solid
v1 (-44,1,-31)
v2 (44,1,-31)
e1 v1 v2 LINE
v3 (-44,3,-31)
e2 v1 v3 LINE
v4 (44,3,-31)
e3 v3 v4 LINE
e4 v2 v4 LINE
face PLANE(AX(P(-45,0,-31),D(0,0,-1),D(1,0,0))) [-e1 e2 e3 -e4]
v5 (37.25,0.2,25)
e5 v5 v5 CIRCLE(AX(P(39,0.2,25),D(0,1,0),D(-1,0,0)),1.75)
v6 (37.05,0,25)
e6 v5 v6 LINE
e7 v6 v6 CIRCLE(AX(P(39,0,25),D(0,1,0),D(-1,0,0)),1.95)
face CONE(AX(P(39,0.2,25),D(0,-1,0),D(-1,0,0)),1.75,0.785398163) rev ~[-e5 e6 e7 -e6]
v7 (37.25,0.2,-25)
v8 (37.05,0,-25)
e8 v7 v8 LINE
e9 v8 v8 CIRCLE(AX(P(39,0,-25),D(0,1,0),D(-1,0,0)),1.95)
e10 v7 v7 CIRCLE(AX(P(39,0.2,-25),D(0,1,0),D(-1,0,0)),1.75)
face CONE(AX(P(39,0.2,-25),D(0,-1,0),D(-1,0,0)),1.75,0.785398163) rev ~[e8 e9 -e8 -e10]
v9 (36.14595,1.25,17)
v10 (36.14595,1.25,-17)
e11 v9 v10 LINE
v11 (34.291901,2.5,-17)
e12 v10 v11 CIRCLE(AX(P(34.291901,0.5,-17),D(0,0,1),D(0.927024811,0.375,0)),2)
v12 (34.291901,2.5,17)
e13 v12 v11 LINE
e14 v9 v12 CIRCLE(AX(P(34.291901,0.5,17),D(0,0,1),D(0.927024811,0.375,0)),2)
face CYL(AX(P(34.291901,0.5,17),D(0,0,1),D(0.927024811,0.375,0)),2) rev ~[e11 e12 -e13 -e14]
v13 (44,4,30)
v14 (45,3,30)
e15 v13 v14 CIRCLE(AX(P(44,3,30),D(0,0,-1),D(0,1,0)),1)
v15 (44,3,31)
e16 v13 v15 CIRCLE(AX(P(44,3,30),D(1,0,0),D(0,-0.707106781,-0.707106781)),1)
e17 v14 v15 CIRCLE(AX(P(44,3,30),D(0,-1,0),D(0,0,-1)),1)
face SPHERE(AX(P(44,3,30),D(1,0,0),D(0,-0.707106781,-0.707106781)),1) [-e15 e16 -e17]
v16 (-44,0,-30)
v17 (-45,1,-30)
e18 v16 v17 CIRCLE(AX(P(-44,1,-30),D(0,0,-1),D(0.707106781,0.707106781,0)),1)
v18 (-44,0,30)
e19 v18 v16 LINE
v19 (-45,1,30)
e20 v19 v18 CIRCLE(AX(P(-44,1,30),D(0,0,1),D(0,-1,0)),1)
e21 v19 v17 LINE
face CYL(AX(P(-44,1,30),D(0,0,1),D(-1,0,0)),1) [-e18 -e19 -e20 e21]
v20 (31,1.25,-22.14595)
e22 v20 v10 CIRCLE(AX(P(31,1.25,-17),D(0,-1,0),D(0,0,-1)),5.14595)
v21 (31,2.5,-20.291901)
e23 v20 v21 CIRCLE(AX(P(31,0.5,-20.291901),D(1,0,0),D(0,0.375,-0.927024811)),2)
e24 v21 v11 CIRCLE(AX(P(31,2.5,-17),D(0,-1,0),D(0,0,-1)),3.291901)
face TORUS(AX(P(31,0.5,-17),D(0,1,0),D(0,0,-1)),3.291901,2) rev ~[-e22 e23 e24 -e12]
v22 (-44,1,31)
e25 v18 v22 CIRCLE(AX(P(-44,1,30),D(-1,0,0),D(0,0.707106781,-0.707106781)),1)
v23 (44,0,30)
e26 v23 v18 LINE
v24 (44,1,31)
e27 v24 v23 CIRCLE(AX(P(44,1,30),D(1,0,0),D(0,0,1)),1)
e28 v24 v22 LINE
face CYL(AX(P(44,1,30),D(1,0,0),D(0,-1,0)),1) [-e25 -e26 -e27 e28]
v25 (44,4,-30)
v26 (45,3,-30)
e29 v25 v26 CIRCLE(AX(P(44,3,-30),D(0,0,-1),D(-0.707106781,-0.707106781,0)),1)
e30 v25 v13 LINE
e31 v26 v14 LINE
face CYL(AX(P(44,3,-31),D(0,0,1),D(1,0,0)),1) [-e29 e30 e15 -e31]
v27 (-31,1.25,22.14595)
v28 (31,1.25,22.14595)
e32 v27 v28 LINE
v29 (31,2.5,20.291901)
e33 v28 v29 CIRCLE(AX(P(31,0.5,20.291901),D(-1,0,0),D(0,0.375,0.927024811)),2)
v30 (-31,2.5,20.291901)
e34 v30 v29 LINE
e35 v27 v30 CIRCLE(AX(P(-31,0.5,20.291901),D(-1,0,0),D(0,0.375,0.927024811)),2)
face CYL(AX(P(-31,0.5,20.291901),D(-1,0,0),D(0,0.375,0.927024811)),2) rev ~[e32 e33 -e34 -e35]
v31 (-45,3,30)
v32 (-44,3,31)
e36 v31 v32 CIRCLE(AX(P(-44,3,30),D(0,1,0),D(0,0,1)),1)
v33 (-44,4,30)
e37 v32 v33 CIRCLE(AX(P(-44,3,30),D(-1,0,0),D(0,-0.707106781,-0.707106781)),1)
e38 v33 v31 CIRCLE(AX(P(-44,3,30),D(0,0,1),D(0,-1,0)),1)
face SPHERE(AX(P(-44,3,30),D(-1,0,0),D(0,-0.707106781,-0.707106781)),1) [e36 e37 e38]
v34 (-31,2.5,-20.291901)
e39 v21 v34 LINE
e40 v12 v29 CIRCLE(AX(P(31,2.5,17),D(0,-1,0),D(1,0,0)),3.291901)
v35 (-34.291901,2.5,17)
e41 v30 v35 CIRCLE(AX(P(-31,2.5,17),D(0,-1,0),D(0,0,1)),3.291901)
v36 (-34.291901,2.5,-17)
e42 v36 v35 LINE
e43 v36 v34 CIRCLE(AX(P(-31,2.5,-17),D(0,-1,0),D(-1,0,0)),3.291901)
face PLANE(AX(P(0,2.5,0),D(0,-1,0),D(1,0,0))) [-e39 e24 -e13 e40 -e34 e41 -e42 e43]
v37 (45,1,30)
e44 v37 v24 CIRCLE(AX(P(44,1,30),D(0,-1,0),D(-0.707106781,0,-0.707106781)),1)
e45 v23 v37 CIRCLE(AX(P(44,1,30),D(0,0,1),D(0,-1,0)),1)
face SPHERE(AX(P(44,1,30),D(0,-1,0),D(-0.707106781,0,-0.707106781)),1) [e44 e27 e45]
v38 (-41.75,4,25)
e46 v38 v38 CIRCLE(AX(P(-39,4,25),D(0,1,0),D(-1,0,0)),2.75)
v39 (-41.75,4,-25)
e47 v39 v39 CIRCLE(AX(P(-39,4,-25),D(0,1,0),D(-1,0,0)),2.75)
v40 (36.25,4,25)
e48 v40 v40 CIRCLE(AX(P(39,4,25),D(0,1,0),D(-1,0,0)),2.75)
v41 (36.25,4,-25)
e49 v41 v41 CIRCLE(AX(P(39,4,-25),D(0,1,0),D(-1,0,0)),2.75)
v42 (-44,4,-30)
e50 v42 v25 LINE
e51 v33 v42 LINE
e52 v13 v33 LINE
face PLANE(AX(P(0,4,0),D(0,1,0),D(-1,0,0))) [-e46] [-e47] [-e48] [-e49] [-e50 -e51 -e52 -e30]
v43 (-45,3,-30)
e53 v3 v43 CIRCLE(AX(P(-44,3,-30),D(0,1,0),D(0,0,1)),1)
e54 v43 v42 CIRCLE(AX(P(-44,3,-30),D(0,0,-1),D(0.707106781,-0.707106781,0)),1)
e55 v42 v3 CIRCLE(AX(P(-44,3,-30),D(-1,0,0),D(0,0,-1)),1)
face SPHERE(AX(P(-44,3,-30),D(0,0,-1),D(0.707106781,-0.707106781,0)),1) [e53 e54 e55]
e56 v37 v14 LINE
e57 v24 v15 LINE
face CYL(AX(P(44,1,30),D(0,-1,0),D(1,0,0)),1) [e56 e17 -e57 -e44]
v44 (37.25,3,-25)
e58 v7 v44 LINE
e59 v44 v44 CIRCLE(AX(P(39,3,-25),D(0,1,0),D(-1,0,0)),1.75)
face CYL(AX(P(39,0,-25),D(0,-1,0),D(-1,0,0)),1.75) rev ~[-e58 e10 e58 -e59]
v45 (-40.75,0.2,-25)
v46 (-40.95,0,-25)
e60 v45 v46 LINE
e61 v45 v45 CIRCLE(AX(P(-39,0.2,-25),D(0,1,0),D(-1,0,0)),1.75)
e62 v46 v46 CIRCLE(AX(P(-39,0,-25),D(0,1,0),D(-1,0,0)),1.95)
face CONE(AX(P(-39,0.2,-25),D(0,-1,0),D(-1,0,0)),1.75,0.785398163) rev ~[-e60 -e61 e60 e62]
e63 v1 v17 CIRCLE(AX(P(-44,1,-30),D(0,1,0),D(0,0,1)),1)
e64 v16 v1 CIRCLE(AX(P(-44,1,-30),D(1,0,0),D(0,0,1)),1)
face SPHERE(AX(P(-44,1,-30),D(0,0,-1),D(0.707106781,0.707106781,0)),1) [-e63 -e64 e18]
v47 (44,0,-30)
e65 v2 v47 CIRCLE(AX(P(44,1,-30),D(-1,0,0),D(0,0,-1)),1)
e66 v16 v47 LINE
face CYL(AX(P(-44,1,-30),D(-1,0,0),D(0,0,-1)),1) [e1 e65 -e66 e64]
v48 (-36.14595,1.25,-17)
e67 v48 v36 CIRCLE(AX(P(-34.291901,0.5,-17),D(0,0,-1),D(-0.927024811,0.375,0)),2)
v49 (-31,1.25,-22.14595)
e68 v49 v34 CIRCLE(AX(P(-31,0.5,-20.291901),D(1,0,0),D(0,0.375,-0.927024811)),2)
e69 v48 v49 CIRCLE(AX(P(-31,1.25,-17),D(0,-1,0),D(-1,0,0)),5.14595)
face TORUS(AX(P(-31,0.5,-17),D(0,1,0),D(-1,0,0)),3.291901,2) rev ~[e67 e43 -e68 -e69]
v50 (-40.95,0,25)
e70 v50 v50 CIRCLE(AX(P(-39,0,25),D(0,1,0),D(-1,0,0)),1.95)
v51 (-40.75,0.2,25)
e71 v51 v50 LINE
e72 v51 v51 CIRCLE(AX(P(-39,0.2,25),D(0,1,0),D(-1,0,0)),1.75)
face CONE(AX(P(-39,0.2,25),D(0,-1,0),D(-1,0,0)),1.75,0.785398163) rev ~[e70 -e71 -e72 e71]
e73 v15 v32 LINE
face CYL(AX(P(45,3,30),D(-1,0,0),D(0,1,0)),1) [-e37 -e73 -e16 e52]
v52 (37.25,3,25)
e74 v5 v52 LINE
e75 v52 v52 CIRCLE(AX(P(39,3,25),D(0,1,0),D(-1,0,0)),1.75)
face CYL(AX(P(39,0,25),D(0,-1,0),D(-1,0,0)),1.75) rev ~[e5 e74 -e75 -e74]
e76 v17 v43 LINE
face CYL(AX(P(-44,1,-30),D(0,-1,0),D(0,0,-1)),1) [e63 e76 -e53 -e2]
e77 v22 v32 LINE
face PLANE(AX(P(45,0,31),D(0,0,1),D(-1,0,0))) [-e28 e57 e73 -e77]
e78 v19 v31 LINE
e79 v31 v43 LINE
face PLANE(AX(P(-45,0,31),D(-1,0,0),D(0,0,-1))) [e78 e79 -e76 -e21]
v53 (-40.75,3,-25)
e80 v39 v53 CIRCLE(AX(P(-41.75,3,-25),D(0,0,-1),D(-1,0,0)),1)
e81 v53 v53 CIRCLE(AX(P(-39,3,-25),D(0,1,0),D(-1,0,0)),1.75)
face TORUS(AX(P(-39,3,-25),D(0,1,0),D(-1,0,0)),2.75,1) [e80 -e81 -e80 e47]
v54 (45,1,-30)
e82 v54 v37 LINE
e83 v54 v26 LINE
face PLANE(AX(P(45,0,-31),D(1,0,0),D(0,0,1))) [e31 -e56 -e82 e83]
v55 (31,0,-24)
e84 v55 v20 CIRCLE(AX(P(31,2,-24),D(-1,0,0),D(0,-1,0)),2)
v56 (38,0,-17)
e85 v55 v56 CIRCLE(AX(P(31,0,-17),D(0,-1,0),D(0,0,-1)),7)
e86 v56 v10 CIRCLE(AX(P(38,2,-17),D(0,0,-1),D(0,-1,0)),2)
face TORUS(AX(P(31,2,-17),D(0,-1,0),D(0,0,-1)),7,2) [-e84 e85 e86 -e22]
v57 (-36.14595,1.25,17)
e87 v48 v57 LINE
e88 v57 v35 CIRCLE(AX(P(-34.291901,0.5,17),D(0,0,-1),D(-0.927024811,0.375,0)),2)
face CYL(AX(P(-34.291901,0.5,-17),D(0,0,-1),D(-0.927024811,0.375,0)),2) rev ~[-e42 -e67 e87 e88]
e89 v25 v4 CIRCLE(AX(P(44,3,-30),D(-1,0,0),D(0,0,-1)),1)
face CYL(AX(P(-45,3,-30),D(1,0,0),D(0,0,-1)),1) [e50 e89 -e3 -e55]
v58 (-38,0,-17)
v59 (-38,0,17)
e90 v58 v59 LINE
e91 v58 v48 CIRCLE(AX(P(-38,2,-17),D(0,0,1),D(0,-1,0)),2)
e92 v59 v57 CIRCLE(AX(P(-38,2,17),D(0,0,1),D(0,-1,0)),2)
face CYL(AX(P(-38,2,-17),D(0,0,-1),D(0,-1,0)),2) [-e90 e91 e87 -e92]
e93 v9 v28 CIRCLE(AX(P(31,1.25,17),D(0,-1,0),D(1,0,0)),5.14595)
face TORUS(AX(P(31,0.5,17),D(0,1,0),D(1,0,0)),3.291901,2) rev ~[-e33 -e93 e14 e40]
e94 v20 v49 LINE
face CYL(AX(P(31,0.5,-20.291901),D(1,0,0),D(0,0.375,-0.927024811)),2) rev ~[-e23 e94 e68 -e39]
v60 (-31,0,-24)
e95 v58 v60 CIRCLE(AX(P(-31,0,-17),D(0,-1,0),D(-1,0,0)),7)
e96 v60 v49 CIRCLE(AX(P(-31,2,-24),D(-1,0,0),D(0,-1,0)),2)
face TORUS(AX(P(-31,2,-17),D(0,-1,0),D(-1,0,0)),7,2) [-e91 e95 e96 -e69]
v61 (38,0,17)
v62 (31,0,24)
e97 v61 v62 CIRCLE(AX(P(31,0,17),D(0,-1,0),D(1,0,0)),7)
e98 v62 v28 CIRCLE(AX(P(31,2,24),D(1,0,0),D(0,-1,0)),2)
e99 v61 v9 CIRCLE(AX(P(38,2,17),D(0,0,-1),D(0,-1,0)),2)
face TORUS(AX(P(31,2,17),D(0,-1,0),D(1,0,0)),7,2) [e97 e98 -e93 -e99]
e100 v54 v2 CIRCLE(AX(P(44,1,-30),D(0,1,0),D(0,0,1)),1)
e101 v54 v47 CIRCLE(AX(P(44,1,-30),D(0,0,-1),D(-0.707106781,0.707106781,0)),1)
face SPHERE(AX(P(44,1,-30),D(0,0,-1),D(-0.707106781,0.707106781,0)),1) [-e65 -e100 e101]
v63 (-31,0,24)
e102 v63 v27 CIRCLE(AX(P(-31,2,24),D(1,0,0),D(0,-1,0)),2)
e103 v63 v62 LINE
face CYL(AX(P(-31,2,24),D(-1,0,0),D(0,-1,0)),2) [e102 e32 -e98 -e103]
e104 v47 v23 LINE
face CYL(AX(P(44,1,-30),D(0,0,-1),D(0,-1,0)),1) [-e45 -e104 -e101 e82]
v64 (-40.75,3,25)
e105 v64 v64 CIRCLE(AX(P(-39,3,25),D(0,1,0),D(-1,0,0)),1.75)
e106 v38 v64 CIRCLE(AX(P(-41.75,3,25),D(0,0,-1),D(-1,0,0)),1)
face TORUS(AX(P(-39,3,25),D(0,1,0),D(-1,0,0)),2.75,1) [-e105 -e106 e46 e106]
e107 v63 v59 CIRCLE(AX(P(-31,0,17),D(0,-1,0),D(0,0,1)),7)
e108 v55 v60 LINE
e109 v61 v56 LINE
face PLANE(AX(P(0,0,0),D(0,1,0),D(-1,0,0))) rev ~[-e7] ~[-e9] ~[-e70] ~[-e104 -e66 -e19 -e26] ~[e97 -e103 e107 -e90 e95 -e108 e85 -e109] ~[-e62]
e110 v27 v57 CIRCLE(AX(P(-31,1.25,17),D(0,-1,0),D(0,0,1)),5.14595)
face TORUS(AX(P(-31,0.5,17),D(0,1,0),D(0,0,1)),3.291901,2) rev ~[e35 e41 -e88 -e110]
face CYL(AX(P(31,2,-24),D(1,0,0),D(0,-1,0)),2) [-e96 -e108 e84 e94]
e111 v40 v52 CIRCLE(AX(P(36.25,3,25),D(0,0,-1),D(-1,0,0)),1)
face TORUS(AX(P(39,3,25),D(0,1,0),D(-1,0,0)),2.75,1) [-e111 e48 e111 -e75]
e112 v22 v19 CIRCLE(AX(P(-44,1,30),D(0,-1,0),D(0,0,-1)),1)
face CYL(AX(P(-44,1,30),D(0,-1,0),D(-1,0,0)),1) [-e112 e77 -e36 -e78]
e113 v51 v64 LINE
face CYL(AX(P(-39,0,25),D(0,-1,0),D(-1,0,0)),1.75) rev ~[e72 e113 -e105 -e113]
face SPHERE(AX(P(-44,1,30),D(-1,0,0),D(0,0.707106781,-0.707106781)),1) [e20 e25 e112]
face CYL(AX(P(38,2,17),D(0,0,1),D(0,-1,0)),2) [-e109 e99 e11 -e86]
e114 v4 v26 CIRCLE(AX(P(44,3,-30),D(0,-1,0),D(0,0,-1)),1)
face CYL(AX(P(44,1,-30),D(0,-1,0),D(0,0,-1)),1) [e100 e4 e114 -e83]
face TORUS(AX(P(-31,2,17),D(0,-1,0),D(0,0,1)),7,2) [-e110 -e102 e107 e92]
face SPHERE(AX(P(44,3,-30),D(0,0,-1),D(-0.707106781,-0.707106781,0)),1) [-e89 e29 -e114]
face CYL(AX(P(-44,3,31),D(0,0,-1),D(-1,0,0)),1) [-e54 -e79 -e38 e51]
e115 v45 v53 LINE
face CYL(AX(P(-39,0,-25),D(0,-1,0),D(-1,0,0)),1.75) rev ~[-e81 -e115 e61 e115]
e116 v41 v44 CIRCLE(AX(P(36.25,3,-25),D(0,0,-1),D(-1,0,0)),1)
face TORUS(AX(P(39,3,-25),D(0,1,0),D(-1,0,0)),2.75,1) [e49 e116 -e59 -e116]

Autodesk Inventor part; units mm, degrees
ref_plane "YZ Plane" through (0, 0, 0) normal (1, 0, 0) x (0, 1, 0)
ref_plane "XZ Plane" through (0, 0, 0) normal (0, 1, 0) x (-1, 0, 0)
ref_plane "XY Plane" through (0, 0, 0) normal (0, 0, 1) x (1, 0, 0)
sketch "Sketch1" plane through (0, 0, 0) normal (0, 1, 0) x (-1, 0, 0)
  line L0 (45, -31) -> (-45, -31)
  line L1 (-45, -31) -> (-45, 31)
  line L2 (-45, 31) -> (45, 31)
  line L3 (45, 31) -> (45, -31)
  circle A0 centre (39, -25) radius 1.75
  circle A1 centre (-39, -25) radius 1.75
  circle A2 centre (-39, 25) radius 1.75
  circle A3 centre (39, 25) radius 1.75
  point P0 (0, 0)
  dimension "d0" = 3.5
  dimension "d1" = 3.5
  dimension "d2" = 3.5
  dimension "d3" = 3.5
  dimension "d4" = 6
  dimension "d5" = 6
  dimension "d6" = 6
  dimension "d7" = 6
  dimension "d8" = 6
  dimension "d9" = 6
  dimension "d10" = 6
  dimension "d11" = 6
  dimension "d12" = 90
  dimension "d13" = 45
  dimension "d14" = 62
  dimension "d15" = 31
extrude "Extrusion1" add sketch "Sketch1" along normal blind 4
sketch "Sketch2" plane through (0, 0, 0) normal (0, -1, 0) x (1, 0, 0)
  circle A0 centre (-39, 25) radius 1.75 projected
  circle A1 centre (39, 25) radius 1.75 projected
  circle A2 centre (39, -25) radius 1.75 projected
  circle A3 centre (-39, -25) radius 1.75 projected
  line L0 (-45, -31) -> (45, -31) projected
  line L1 (45, -31) -> (45, 31) projected
  line L2 (45, 31) -> (-45, 31) projected
  line L3 (-45, 31) -> (-45, -31) projected
  line L4 (-31, 22) -> (31, 22)
  line L5 (36, 17) -> (36, -17)
  line L6 (31, -22) -> (-31, -22)
  line L7 (-36, -17) -> (-36, 17)
  arc A4 (-31, 22) -> (-36, 17) centre (-31, 17) ccw
  arc A5 (-36, -17) -> (-31, -22) centre (-31, -17) ccw
  arc A6 (31, -22) -> (36, -17) centre (31, -17) ccw
  arc A7 (36, 17) -> (31, 22) centre (31, 17) ccw
  point P0 (0, 0)
  dimension "d18" = 5
  dimension "d19" = 5
  dimension "d20" = 9
extrude "Extrusion2" cut sketch "Sketch2" against normal blind 2.5 contours L4 A7 L5 A6 L6 A5 L7 A4
fillet "Fillet1" radius 2 16 edges at (0, 0, 22) (0, 2.5, 22) (34.5355, 0, 20.5355) (36, 0, 0) (34.5355, 0, -20.5355) (0, 0, -22) (-34.5355, 0, -20.5355) (-36, 0, 0) (-34.5355, 0, 20.5355) (34.5355, 2.5, 20.5355) (36, 2.5, 0) (34.5355, 2.5, -20.5355) (0, 2.5, -22) (-34.5355, 2.5, -20.5355) (-36, 2.5, 0) (-34.5355, 2.5, 20.5355)
fillet "Fillet2" radius 1 4 edges at (0, 4, -31) (-45, 4, 0) (0, 4, 31) (45, 4, 0)
fillet "Fillet3" radius 1 12 edges at (45, 1.5, 31) (45, 0, 0) (45, 1.5, -31) (44.7071, 3.7071, 30.7071) (44.7071, 3.7071, -30.7071) (0, 0, -31) (0, 0, 31) (-45, 0, 0) (-44.7071, 3.7071, -30.7071) (-45, 1.5, -31) (-44.7071, 3.7071, 30.7071) (-45, 1.5, 31)
fillet "Fillet4" radius 1 4 edges at (40.75, 4, 25) (-37.25, 4, 25) (-37.25, 4, -25) (40.75, 4, -25)
chamfer "Chamfer1" distance 0.2 angle 45 4 edges at (-37.25, 0, 25) (40.75, 0, 25) (40.75, 0, -25) (-37.25, 0, -25)
equation "\"d13\" = 0.5 * d12"
equation "\"d15\" = 0.5 * d14"
properties part number "Solar Module Lid"
